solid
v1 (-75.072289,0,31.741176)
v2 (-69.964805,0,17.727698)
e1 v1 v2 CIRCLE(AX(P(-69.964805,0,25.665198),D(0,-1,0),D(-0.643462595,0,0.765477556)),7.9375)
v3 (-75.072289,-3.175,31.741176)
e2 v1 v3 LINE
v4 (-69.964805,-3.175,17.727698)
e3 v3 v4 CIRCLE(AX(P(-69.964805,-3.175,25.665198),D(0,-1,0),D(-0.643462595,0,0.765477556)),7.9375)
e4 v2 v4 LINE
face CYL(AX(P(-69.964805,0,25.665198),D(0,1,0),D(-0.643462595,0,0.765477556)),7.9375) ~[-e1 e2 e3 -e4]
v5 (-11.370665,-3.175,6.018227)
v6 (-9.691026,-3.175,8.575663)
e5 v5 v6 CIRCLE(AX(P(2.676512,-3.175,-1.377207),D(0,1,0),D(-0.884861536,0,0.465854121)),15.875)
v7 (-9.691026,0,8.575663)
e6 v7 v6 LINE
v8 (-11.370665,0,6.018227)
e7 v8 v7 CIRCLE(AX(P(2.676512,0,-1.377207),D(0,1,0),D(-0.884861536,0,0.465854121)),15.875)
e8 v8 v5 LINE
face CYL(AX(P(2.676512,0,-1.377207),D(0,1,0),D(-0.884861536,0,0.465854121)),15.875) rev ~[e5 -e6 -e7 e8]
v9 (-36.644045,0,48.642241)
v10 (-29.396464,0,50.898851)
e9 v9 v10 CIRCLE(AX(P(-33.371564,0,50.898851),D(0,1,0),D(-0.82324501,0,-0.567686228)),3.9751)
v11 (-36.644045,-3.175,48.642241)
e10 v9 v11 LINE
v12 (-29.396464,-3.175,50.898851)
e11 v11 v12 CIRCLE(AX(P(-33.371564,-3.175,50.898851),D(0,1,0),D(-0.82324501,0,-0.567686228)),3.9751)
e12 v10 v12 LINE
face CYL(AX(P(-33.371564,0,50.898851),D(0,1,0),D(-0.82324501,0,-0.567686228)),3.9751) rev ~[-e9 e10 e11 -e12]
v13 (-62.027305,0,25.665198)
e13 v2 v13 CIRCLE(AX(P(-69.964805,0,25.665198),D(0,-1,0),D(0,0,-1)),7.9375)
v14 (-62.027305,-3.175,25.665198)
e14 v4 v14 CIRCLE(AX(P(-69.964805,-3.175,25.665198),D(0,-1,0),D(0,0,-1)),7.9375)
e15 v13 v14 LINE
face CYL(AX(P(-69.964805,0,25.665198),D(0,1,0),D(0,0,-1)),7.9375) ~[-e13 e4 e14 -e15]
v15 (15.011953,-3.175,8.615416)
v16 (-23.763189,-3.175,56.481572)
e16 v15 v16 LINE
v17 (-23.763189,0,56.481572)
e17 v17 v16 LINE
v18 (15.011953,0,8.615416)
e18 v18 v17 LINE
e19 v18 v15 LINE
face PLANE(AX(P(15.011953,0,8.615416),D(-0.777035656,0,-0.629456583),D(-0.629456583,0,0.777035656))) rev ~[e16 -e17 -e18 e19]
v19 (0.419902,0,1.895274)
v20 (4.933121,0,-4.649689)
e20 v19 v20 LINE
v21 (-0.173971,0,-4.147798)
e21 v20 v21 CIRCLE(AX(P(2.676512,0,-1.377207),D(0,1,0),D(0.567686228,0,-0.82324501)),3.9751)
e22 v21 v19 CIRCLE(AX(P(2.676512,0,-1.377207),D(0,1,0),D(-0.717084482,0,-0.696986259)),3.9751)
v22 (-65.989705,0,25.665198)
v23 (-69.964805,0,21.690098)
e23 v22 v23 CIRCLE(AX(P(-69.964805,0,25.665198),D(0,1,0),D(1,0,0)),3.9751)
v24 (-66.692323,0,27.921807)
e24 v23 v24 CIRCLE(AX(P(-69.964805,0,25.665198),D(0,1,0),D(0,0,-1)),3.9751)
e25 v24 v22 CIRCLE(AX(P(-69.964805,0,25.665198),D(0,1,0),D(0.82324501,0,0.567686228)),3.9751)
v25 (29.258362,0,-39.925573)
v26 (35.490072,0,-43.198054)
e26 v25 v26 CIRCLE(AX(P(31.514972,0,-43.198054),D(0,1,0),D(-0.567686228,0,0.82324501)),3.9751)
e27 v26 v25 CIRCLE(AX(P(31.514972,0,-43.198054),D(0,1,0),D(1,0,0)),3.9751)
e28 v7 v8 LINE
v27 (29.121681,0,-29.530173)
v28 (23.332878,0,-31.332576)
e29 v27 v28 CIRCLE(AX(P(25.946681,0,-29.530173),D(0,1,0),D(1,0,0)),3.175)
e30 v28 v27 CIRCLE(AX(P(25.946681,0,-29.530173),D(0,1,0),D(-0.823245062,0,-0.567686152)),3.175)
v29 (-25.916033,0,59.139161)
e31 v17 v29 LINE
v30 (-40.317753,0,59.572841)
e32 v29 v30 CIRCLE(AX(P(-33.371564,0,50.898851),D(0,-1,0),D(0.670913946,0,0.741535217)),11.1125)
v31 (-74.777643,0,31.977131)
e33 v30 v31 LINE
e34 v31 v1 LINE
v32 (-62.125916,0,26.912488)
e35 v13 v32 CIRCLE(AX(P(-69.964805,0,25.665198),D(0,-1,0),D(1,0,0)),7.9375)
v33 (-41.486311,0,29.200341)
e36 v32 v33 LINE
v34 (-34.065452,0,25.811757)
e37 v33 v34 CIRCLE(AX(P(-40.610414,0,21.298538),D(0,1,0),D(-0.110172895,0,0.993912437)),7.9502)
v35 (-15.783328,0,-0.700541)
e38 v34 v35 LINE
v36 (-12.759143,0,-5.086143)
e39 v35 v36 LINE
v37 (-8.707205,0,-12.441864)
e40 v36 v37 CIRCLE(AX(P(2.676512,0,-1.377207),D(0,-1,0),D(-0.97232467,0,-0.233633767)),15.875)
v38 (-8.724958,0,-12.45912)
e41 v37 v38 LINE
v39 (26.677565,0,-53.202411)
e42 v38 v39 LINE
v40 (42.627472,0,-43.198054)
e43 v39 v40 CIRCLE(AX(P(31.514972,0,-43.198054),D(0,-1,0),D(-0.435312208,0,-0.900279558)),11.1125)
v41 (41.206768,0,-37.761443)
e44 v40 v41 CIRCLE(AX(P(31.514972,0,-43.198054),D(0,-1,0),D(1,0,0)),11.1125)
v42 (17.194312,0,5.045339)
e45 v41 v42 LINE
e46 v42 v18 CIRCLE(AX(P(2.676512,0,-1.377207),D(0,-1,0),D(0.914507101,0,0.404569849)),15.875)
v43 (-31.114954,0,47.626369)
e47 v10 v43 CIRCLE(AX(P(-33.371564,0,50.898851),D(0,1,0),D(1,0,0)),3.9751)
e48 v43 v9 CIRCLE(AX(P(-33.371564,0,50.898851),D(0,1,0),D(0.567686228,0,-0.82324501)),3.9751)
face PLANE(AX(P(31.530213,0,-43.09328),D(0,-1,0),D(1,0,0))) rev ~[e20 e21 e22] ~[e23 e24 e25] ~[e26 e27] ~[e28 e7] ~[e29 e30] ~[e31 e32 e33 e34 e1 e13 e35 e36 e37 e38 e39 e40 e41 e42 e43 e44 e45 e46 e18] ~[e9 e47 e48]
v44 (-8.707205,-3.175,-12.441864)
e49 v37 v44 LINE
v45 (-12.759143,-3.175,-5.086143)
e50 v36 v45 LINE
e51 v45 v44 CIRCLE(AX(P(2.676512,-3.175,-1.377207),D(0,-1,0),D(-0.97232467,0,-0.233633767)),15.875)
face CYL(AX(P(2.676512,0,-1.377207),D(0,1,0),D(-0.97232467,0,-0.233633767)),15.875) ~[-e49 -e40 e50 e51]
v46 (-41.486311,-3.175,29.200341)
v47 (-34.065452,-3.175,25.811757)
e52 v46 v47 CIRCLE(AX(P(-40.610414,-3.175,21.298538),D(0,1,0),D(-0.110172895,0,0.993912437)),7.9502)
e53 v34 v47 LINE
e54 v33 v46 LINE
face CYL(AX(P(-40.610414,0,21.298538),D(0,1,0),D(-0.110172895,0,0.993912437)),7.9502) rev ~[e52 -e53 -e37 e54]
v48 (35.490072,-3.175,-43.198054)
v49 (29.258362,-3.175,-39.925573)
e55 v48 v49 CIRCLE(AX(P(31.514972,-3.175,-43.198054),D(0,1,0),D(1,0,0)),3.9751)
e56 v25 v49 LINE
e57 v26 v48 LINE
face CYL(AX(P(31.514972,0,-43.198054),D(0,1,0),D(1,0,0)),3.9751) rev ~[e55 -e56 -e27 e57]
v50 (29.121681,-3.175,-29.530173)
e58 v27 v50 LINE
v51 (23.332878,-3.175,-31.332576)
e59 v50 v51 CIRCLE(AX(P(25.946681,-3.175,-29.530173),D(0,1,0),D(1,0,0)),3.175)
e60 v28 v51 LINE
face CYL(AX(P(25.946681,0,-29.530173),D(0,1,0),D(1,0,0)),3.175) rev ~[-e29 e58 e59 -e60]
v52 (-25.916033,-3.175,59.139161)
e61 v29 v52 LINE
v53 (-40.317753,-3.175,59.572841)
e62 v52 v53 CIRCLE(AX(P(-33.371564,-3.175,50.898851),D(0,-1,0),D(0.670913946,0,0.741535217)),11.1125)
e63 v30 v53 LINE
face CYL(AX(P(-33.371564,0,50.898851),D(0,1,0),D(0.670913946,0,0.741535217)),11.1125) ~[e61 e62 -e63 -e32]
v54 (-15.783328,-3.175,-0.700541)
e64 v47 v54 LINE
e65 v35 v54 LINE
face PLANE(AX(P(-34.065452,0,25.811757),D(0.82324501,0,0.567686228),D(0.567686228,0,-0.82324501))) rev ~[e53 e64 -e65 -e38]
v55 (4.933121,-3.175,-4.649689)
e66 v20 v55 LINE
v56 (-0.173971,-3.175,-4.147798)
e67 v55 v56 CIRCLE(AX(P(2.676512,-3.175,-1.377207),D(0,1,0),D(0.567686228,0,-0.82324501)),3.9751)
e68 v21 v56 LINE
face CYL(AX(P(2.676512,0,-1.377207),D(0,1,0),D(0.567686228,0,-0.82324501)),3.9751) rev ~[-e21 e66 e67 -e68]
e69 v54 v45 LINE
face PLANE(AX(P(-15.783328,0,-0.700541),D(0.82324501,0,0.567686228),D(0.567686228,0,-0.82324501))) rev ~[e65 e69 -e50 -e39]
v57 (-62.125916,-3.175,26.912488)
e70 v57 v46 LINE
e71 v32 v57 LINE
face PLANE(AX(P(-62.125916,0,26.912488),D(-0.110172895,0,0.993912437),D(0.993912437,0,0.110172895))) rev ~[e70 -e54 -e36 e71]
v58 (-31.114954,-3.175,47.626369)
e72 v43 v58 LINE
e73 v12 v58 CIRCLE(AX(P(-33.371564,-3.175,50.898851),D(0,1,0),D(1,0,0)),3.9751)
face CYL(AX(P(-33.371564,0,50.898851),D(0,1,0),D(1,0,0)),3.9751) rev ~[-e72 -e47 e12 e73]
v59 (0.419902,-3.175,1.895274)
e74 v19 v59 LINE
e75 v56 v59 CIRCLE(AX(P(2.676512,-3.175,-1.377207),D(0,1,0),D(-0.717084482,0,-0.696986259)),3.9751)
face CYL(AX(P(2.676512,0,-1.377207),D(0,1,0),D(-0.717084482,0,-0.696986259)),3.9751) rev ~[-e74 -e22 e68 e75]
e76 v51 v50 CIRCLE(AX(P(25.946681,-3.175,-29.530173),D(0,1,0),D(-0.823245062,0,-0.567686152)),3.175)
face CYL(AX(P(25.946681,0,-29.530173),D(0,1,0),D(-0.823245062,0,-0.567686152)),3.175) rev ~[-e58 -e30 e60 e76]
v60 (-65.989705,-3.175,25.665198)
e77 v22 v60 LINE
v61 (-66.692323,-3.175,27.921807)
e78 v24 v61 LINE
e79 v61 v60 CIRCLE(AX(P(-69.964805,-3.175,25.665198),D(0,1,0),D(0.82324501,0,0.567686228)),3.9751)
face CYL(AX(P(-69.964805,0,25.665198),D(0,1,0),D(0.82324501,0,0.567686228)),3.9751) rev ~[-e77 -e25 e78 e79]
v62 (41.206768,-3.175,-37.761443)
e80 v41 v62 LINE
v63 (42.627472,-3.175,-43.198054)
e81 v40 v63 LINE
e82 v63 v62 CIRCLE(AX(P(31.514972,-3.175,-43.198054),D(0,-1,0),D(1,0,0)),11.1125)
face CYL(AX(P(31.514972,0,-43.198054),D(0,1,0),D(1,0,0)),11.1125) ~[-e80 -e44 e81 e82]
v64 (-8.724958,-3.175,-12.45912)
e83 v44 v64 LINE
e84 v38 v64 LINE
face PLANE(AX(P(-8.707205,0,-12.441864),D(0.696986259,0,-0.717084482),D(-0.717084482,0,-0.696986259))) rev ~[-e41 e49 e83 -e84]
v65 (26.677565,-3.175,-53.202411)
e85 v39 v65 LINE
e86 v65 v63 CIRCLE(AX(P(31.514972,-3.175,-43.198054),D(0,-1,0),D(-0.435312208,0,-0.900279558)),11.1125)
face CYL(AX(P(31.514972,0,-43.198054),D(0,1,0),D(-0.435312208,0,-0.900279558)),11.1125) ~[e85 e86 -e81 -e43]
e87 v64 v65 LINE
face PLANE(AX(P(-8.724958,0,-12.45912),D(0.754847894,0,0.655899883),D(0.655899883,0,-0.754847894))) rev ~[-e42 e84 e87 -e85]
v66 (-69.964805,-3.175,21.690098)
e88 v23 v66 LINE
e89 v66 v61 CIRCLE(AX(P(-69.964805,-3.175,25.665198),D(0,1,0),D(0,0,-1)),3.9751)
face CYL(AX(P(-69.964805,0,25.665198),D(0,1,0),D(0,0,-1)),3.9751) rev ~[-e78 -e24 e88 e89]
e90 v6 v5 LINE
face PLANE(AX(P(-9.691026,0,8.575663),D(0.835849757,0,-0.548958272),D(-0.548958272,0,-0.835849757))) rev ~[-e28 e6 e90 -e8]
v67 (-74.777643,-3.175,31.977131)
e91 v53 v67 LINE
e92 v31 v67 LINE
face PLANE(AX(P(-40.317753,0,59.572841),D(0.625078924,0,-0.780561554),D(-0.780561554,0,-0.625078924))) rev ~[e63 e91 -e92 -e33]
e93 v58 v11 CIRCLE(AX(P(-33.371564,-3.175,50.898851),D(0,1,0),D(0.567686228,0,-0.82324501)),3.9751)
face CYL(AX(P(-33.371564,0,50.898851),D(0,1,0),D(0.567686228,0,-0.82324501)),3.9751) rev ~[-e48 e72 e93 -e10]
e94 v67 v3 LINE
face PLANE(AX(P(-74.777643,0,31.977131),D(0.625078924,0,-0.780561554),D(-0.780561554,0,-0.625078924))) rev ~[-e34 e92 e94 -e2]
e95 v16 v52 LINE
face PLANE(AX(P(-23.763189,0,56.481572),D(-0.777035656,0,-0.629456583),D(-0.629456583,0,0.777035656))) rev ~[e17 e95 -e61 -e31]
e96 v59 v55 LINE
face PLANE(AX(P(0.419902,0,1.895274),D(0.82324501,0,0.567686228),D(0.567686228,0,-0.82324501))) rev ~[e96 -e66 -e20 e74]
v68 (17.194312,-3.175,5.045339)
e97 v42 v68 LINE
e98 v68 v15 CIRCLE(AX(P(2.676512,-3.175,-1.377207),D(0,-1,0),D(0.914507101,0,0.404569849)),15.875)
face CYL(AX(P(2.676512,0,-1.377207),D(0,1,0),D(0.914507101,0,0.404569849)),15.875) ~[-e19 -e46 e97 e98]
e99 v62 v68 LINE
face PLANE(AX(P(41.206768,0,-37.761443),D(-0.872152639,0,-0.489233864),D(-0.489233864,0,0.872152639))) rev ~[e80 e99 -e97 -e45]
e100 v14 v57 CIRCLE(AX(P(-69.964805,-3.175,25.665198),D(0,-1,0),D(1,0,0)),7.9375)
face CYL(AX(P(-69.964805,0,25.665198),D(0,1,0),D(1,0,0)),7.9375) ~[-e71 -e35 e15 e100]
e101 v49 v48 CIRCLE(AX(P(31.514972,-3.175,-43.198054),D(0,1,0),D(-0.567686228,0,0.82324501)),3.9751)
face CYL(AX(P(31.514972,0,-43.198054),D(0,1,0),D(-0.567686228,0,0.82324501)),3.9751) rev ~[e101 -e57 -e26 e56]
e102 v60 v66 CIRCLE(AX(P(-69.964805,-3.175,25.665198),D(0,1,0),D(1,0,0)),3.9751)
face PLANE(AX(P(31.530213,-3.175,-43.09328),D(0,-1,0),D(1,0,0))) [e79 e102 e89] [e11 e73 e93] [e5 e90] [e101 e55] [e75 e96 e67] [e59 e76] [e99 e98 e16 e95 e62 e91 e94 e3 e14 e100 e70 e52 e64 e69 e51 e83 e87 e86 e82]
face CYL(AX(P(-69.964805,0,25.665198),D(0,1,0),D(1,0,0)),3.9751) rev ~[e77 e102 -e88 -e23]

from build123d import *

# Parameters (mm, degrees)
F1_DEPTH = 3.175


# Not quite as in the source:
# - a feature names something its author has since deleted; it is built from what else it names


with BuildPart() as f1:
    # F0 (on Front) → F1 (new body)
    with BuildSketch(Plane.XZ):
        with BuildLine():
            ThreePointArc((41.2067680932, -37.761442646), (34.0261463641, -32.3730062039), (25.2065586875, -34.049743787))
            ThreePointArc((25.2065586875, -34.049743787), (20.9962687571, -39.6141258639), (20.9333080978, -46.5915842229))
            Line((20.9333080978, -46.5915842229), (26.6775649821, -53.2024105477))
            ThreePointArc((26.6775649821, -53.2024105477), (37.4197145601, -52.6119623059), (42.6274718911, -43.1980539644))
            ThreePointArc((42.6274718911, -43.1980539644), (42.2664308978, -40.3884658314), (41.2067680932, -37.761442646))
        make_face()
        with BuildLine():
            ThreePointArc((35.4900718911, -43.1980539644), (29.6668415528, -46.7174053624), (29.258362368, -39.9255727238))
            ThreePointArc((29.258362368, -39.9255727238), (33.3631022294, -39.6787025664), (35.4900718911, -43.1980539644))
        make_face(mode=Mode.SUBTRACT)
        with BuildLine():
            ThreePointArc((20.9333080978, -46.5915842229), (20.9962687571, -39.6141258639), (25.2065586875, -34.049743787))
            Line((25.2065586875, -34.049743787), (23.332877686, -31.3325763437))
            Line((23.332877686, -31.3325763437), (11.7179656145, -14.4889082319))
            Line((11.7179656145, -14.4889082319), (0.788153606, -23.4073638243))
            Line((0.788153606, -23.4073638243), (20.9333080978, -46.5915842229))
        make_face()
        with BuildLine():
            Line((23.332877686, -31.3325763437), (25.2065586875, -34.049743787))
            ThreePointArc((25.2065586875, -34.049743787), (34.0261463641, -32.3730062039), (41.2067680932, -37.761442646))
            Line((41.2067680932, -37.761442646), (17.1943117559, 5.0453389137))
            ThreePointArc((17.1943117559, 5.0453389137), (18.2085059877, 1.9049828695), (18.5515115318, -1.377207439))
            ThreePointArc((18.5515115318, -1.377207439), (17.0177668978, -8.1848516369), (12.7128948986, -13.6770706055))
            Line((12.7128948986, -13.6770706055), (11.7179656145, -14.4889082319))
            Line((11.7179656145, -14.4889082319), (23.332877686, -31.3325763437))
        make_face()
        with BuildLine():
            ThreePointArc((29.1216807586, -29.5301728102), (26.8905558151, -32.5616287109), (23.332877686, -31.3325763437))
            ThreePointArc((23.332877686, -31.3325763437), (25.0028057021, -26.4987169095), (29.1216807586, -29.5301728102))
        make_face(mode=Mode.SUBTRACT)
        with BuildLine():
            Line((0.788153606, -23.4073638243), (11.7179656145, -14.4889082319))
            Line((11.7179656145, -14.4889082319), (11.6885303941, -14.4462219782))
            ThreePointArc((11.6885303941, -14.4462219782), (1.1239010077, -17.1761006141), (-8.7072046251, -12.4418643003))
            Line((-8.7072046251, -12.4418643003), (-8.7249576565, -12.4591197552))
            Line((-8.7249576565, -12.4591197552), (0.788153606, -23.4073638243))
        make_face()
        with BuildLine():
            Line((11.6885303941, -14.4462219782), (11.7179656145, -14.4889082319))
            Line((11.7179656145, -14.4889082319), (12.7128948986, -13.6770706055))
            ThreePointArc((12.7128948986, -13.6770706055), (12.2084738339, -14.0719827293), (11.6885303941, -14.4462219782))
        make_face()
        with BuildLine():
            ThreePointArc((18.5515115318, -1.377207439), (18.2085059877, 1.9049828695), (17.1943117559, 5.0453389137))
            ThreePointArc((17.1943117559, 5.0453389137), (16.2212708068, 6.9025945623), (15.0119525687, 8.6154158115))
            ThreePointArc((15.0119525687, 8.6154158115), (4.9408722756, 14.3354720086), (-6.3355073305, 11.6918071002))
            Line((-6.3355073305, 11.6918071002), (0.4199020087, 1.8952738016))
            ThreePointArc((0.4199020087, 1.8952738016), (4.5246418701, 2.142143959), (6.6516115318, -1.377207439))
            ThreePointArc((6.6516115318, -1.377207439), (6.1958629298, -3.2253377773), (4.9331210549, -4.6496886796))
            Line((4.9331210549, -4.6496886796), (11.6885303941, -14.4462219782))
            ThreePointArc((11.6885303941, -14.4462219782), (12.2084738339, -14.0719827293), (12.7128948986, -13.6770706055))
            ThreePointArc((12.7128948986, -13.6770706055), (17.0177668978, -8.1848516369), (18.5515115318, -1.377207439))
        make_face()
        with BuildLine():
            ThreePointArc((-8.7072046251, -12.4418643003), (1.1239010077, -17.1761006141), (11.6885303941, -14.4462219782))
            Line((11.6885303941, -14.4462219782), (4.9331210549, -4.6496886796))
            ThreePointArc((4.9331210549, -4.6496886796), (2.2877378565, -5.33325029), (-0.1739709939, -4.147797517))
            Line((-0.1739709939, -4.147797517), (-8.7072046251, -12.4418643003))
        make_face()
        with BuildLine():
            ThreePointArc((-6.3355073305, 11.6918071002), (4.9408722756, 14.3354720086), (15.0119525687, 8.6154158115))
            Line((15.0119525687, 8.6154158115), (-23.7631885124, 56.4815721265))
            ThreePointArc((-23.7631885124, 56.4815721265), (-22.6416820928, 53.7897488967), (-22.2590639174, 50.8988507178))
            ThreePointArc((-22.2590639174, 50.8988507178), (-23.5331215108, 45.7323521683), (-27.0631507138, 41.7505405404))
            Line((-27.0631507138, 41.7505405404), (-6.3355073305, 11.6918071002))
        make_face()
        with BuildLine():
            Line((2.6765115318, -1.377207439), (4.9331210549, -4.6496886796))
            ThreePointArc((4.9331210549, -4.6496886796), (6.1958629298, -3.2253377773), (6.6516115318, -1.377207439))
            ThreePointArc((6.6516115318, -1.377207439), (4.5246418701, 2.142143959), (0.4199020087, 1.8952738016))
            Line((0.4199020087, 1.8952738016), (2.6765115318, -1.377207439))
        make_face()
        with BuildLine():
            ThreePointArc((-12.7591425966, -5.0861434898), (-11.2283909413, -9.0367969981), (-8.7072046251, -12.4418643003))
            Line((-8.7072046251, -12.4418643003), (-0.1739709939, -4.147797517))
            ThreePointArc((-0.1739709939, -4.147797517), (-1.2795313193, -0.9884337637), (0.4199020087, 1.8952738016))
            Line((0.4199020087, 1.8952738016), (-6.3355073305, 11.6918071002))
            ThreePointArc((-6.3355073305, 11.6918071002), (-8.12621733, 10.2553621026), (-9.6910264168, 8.5756630059))
            Line((-9.6910264168, 8.5756630059), (-11.3706653491, 6.0182267388))
            ThreePointArc((-11.3706653491, 6.0182267388), (-13.0758245053, 0.5924459256), (-12.7591425966, -5.0861434898))
        make_face()
        with BuildLine():
            ThreePointArc((-9.6910264168, 8.5756630059), (-8.12621733, 10.2553621026), (-6.3355073305, 11.6918071002))
            Line((-6.3355073305, 11.6918071002), (-27.0631507138, 41.7505405404))
            ThreePointArc((-27.0631507138, 41.7505405404), (-35.3796743255, 39.9692968001), (-42.5198740948, 44.5904375142))
            Line((-42.5198740948, 44.5904375142), (-63.4302973575, 30.1712073345))
            ThreePointArc((-63.4302973575, 30.1712073345), (-62.5957178566, 28.6148532084), (-62.125916075, 26.9124879729))
            Line((-62.125916075, 26.9124879729), (-41.4863105467, 29.2003405071))
            ThreePointArc((-41.4863105467, 29.2003405071), (-37.3081114888, 28.5304448001), (-34.0654515171, 25.8117568934))
            Line((-34.0654515171, 25.8117568934), (-15.783328424, -0.7005414231))
            Line((-15.783328424, -0.7005414231), (-11.3706653491, 6.0182267388))
            ThreePointArc((-11.3706653491, 6.0182267388), (-10.5926033575, 7.337505124), (-9.6910264168, 8.5756630059))
        make_face()
        with BuildLine():
            ThreePointArc((-22.2590639174, 50.8988507178), (-22.6416820928, 53.7897488967), (-23.7631885124, 56.4815721265))
            Line((-23.7631885124, 56.4815721265), (-25.9160326978, 59.1391608141))
            ThreePointArc((-25.9160326978, 59.1391608141), (-33.0370839347, 62.0063157477), (-40.3177534576, 59.572840983))
            ThreePointArc((-40.3177534576, 59.572840983), (-44.3659412857, 52.514809422), (-42.5198740948, 44.5904375142))
            Line((-42.5198740948, 44.5904375142), (-36.644045158, 48.6422411947))
            ThreePointArc((-36.644045158, 48.6422411947), (-34.5532956616, 54.6942334514), (-29.3964639174, 50.8988507178))
            ThreePointArc((-29.3964639174, 50.8988507178), (-29.8522125194, 49.0507203795), (-31.1149543943, 47.6263694772))
            Line((-31.1149543943, 47.6263694772), (-27.0631507138, 41.7505405404))
            ThreePointArc((-27.0631507138, 41.7505405404), (-23.5331215108, 45.7323521683), (-22.2590639174, 50.8988507178))
        make_face()
        with BuildLine():
            Line((-15.783328424, -0.7005414231), (-12.7591425966, -5.0861434898))
            ThreePointArc((-12.7591425966, -5.0861434898), (-13.0758245053, 0.5924459256), (-11.3706653491, 6.0182267388))
            Line((-11.3706653491, 6.0182267388), (-15.783328424, -0.7005414231))
        make_face()
        with BuildLine():
            ThreePointArc((-42.5198740948, 44.5904375142), (-35.3796743255, 39.9692968001), (-27.0631507138, 41.7505405404))
            Line((-27.0631507138, 41.7505405404), (-31.1149543943, 47.6263694772))
            ThreePointArc((-31.1149543943, 47.6263694772), (-34.0898936977, 46.989193145), (-36.644045158, 48.6422411947))
            Line((-36.644045158, 48.6422411947), (-42.5198740948, 44.5904375142))
        make_face()
        with BuildLine():
            Line((-63.4302973575, 30.1712073345), (-42.5198740948, 44.5904375142))
            ThreePointArc((-42.5198740948, 44.5904375142), (-44.3659412857, 52.514809422), (-40.3177534576, 59.572840983))
            Line((-40.3177534576, 59.572840983), (-74.7776425006, 31.9771308762))
            ThreePointArc((-74.7776425006, 31.9771308762), (-68.717256497, 33.5040453897), (-63.4302973575, 30.1712073345))
        make_face()
        with BuildLine():
            ThreePointArc((-62.125916075, 26.9124879729), (-62.5957178566, 28.6148532084), (-63.4302973575, 30.1712073345))
            Line((-63.4302973575, 30.1712073345), (-66.6923233865, 27.9218074265))
            ThreePointArc((-66.6923233865, 27.9218074265), (-66.1694218935, 26.8469296476), (-65.9897046271, 25.6651979034))
            ThreePointArc((-65.9897046271, 25.6651979034), (-67.1539844612, 22.8543777375), (-69.9648046271, 21.6900979034))
            Line((-69.9648046271, 21.6900979034), (-69.9648046271, 17.7276979034))
            ThreePointArc((-69.9648046271, 17.7276979034), (-64.3521445515, 20.0525378277), (-62.0273046271, 25.6651979034))
            ThreePointArc((-62.0273046271, 25.6651979034), (-62.0519958928, 26.2907889709), (-62.125916075, 26.9124879729))
        make_face()
        with BuildLine():
            Line((-66.6923233865, 27.9218074265), (-63.4302973575, 30.1712073345))
            ThreePointArc((-63.4302973575, 30.1712073345), (-68.717256497, 33.5040453897), (-74.7776425006, 31.9771308762))
            Line((-74.7776425006, 31.9771308762), (-75.0722889717, 31.7411760073))
            ThreePointArc((-75.0722889717, 31.7411760073), (-77.4224175981, 22.9471259719), (-69.9648046271, 17.7276979034))
            Line((-69.9648046271, 17.7276979034), (-69.9648046271, 21.6900979034))
            ThreePointArc((-69.9648046271, 21.6900979034), (-73.4841560252, 27.5133282417), (-66.6923233865, 27.9218074265))
        make_face()
    extrude(amount=F1_DEPTH)


solid = f1.part
